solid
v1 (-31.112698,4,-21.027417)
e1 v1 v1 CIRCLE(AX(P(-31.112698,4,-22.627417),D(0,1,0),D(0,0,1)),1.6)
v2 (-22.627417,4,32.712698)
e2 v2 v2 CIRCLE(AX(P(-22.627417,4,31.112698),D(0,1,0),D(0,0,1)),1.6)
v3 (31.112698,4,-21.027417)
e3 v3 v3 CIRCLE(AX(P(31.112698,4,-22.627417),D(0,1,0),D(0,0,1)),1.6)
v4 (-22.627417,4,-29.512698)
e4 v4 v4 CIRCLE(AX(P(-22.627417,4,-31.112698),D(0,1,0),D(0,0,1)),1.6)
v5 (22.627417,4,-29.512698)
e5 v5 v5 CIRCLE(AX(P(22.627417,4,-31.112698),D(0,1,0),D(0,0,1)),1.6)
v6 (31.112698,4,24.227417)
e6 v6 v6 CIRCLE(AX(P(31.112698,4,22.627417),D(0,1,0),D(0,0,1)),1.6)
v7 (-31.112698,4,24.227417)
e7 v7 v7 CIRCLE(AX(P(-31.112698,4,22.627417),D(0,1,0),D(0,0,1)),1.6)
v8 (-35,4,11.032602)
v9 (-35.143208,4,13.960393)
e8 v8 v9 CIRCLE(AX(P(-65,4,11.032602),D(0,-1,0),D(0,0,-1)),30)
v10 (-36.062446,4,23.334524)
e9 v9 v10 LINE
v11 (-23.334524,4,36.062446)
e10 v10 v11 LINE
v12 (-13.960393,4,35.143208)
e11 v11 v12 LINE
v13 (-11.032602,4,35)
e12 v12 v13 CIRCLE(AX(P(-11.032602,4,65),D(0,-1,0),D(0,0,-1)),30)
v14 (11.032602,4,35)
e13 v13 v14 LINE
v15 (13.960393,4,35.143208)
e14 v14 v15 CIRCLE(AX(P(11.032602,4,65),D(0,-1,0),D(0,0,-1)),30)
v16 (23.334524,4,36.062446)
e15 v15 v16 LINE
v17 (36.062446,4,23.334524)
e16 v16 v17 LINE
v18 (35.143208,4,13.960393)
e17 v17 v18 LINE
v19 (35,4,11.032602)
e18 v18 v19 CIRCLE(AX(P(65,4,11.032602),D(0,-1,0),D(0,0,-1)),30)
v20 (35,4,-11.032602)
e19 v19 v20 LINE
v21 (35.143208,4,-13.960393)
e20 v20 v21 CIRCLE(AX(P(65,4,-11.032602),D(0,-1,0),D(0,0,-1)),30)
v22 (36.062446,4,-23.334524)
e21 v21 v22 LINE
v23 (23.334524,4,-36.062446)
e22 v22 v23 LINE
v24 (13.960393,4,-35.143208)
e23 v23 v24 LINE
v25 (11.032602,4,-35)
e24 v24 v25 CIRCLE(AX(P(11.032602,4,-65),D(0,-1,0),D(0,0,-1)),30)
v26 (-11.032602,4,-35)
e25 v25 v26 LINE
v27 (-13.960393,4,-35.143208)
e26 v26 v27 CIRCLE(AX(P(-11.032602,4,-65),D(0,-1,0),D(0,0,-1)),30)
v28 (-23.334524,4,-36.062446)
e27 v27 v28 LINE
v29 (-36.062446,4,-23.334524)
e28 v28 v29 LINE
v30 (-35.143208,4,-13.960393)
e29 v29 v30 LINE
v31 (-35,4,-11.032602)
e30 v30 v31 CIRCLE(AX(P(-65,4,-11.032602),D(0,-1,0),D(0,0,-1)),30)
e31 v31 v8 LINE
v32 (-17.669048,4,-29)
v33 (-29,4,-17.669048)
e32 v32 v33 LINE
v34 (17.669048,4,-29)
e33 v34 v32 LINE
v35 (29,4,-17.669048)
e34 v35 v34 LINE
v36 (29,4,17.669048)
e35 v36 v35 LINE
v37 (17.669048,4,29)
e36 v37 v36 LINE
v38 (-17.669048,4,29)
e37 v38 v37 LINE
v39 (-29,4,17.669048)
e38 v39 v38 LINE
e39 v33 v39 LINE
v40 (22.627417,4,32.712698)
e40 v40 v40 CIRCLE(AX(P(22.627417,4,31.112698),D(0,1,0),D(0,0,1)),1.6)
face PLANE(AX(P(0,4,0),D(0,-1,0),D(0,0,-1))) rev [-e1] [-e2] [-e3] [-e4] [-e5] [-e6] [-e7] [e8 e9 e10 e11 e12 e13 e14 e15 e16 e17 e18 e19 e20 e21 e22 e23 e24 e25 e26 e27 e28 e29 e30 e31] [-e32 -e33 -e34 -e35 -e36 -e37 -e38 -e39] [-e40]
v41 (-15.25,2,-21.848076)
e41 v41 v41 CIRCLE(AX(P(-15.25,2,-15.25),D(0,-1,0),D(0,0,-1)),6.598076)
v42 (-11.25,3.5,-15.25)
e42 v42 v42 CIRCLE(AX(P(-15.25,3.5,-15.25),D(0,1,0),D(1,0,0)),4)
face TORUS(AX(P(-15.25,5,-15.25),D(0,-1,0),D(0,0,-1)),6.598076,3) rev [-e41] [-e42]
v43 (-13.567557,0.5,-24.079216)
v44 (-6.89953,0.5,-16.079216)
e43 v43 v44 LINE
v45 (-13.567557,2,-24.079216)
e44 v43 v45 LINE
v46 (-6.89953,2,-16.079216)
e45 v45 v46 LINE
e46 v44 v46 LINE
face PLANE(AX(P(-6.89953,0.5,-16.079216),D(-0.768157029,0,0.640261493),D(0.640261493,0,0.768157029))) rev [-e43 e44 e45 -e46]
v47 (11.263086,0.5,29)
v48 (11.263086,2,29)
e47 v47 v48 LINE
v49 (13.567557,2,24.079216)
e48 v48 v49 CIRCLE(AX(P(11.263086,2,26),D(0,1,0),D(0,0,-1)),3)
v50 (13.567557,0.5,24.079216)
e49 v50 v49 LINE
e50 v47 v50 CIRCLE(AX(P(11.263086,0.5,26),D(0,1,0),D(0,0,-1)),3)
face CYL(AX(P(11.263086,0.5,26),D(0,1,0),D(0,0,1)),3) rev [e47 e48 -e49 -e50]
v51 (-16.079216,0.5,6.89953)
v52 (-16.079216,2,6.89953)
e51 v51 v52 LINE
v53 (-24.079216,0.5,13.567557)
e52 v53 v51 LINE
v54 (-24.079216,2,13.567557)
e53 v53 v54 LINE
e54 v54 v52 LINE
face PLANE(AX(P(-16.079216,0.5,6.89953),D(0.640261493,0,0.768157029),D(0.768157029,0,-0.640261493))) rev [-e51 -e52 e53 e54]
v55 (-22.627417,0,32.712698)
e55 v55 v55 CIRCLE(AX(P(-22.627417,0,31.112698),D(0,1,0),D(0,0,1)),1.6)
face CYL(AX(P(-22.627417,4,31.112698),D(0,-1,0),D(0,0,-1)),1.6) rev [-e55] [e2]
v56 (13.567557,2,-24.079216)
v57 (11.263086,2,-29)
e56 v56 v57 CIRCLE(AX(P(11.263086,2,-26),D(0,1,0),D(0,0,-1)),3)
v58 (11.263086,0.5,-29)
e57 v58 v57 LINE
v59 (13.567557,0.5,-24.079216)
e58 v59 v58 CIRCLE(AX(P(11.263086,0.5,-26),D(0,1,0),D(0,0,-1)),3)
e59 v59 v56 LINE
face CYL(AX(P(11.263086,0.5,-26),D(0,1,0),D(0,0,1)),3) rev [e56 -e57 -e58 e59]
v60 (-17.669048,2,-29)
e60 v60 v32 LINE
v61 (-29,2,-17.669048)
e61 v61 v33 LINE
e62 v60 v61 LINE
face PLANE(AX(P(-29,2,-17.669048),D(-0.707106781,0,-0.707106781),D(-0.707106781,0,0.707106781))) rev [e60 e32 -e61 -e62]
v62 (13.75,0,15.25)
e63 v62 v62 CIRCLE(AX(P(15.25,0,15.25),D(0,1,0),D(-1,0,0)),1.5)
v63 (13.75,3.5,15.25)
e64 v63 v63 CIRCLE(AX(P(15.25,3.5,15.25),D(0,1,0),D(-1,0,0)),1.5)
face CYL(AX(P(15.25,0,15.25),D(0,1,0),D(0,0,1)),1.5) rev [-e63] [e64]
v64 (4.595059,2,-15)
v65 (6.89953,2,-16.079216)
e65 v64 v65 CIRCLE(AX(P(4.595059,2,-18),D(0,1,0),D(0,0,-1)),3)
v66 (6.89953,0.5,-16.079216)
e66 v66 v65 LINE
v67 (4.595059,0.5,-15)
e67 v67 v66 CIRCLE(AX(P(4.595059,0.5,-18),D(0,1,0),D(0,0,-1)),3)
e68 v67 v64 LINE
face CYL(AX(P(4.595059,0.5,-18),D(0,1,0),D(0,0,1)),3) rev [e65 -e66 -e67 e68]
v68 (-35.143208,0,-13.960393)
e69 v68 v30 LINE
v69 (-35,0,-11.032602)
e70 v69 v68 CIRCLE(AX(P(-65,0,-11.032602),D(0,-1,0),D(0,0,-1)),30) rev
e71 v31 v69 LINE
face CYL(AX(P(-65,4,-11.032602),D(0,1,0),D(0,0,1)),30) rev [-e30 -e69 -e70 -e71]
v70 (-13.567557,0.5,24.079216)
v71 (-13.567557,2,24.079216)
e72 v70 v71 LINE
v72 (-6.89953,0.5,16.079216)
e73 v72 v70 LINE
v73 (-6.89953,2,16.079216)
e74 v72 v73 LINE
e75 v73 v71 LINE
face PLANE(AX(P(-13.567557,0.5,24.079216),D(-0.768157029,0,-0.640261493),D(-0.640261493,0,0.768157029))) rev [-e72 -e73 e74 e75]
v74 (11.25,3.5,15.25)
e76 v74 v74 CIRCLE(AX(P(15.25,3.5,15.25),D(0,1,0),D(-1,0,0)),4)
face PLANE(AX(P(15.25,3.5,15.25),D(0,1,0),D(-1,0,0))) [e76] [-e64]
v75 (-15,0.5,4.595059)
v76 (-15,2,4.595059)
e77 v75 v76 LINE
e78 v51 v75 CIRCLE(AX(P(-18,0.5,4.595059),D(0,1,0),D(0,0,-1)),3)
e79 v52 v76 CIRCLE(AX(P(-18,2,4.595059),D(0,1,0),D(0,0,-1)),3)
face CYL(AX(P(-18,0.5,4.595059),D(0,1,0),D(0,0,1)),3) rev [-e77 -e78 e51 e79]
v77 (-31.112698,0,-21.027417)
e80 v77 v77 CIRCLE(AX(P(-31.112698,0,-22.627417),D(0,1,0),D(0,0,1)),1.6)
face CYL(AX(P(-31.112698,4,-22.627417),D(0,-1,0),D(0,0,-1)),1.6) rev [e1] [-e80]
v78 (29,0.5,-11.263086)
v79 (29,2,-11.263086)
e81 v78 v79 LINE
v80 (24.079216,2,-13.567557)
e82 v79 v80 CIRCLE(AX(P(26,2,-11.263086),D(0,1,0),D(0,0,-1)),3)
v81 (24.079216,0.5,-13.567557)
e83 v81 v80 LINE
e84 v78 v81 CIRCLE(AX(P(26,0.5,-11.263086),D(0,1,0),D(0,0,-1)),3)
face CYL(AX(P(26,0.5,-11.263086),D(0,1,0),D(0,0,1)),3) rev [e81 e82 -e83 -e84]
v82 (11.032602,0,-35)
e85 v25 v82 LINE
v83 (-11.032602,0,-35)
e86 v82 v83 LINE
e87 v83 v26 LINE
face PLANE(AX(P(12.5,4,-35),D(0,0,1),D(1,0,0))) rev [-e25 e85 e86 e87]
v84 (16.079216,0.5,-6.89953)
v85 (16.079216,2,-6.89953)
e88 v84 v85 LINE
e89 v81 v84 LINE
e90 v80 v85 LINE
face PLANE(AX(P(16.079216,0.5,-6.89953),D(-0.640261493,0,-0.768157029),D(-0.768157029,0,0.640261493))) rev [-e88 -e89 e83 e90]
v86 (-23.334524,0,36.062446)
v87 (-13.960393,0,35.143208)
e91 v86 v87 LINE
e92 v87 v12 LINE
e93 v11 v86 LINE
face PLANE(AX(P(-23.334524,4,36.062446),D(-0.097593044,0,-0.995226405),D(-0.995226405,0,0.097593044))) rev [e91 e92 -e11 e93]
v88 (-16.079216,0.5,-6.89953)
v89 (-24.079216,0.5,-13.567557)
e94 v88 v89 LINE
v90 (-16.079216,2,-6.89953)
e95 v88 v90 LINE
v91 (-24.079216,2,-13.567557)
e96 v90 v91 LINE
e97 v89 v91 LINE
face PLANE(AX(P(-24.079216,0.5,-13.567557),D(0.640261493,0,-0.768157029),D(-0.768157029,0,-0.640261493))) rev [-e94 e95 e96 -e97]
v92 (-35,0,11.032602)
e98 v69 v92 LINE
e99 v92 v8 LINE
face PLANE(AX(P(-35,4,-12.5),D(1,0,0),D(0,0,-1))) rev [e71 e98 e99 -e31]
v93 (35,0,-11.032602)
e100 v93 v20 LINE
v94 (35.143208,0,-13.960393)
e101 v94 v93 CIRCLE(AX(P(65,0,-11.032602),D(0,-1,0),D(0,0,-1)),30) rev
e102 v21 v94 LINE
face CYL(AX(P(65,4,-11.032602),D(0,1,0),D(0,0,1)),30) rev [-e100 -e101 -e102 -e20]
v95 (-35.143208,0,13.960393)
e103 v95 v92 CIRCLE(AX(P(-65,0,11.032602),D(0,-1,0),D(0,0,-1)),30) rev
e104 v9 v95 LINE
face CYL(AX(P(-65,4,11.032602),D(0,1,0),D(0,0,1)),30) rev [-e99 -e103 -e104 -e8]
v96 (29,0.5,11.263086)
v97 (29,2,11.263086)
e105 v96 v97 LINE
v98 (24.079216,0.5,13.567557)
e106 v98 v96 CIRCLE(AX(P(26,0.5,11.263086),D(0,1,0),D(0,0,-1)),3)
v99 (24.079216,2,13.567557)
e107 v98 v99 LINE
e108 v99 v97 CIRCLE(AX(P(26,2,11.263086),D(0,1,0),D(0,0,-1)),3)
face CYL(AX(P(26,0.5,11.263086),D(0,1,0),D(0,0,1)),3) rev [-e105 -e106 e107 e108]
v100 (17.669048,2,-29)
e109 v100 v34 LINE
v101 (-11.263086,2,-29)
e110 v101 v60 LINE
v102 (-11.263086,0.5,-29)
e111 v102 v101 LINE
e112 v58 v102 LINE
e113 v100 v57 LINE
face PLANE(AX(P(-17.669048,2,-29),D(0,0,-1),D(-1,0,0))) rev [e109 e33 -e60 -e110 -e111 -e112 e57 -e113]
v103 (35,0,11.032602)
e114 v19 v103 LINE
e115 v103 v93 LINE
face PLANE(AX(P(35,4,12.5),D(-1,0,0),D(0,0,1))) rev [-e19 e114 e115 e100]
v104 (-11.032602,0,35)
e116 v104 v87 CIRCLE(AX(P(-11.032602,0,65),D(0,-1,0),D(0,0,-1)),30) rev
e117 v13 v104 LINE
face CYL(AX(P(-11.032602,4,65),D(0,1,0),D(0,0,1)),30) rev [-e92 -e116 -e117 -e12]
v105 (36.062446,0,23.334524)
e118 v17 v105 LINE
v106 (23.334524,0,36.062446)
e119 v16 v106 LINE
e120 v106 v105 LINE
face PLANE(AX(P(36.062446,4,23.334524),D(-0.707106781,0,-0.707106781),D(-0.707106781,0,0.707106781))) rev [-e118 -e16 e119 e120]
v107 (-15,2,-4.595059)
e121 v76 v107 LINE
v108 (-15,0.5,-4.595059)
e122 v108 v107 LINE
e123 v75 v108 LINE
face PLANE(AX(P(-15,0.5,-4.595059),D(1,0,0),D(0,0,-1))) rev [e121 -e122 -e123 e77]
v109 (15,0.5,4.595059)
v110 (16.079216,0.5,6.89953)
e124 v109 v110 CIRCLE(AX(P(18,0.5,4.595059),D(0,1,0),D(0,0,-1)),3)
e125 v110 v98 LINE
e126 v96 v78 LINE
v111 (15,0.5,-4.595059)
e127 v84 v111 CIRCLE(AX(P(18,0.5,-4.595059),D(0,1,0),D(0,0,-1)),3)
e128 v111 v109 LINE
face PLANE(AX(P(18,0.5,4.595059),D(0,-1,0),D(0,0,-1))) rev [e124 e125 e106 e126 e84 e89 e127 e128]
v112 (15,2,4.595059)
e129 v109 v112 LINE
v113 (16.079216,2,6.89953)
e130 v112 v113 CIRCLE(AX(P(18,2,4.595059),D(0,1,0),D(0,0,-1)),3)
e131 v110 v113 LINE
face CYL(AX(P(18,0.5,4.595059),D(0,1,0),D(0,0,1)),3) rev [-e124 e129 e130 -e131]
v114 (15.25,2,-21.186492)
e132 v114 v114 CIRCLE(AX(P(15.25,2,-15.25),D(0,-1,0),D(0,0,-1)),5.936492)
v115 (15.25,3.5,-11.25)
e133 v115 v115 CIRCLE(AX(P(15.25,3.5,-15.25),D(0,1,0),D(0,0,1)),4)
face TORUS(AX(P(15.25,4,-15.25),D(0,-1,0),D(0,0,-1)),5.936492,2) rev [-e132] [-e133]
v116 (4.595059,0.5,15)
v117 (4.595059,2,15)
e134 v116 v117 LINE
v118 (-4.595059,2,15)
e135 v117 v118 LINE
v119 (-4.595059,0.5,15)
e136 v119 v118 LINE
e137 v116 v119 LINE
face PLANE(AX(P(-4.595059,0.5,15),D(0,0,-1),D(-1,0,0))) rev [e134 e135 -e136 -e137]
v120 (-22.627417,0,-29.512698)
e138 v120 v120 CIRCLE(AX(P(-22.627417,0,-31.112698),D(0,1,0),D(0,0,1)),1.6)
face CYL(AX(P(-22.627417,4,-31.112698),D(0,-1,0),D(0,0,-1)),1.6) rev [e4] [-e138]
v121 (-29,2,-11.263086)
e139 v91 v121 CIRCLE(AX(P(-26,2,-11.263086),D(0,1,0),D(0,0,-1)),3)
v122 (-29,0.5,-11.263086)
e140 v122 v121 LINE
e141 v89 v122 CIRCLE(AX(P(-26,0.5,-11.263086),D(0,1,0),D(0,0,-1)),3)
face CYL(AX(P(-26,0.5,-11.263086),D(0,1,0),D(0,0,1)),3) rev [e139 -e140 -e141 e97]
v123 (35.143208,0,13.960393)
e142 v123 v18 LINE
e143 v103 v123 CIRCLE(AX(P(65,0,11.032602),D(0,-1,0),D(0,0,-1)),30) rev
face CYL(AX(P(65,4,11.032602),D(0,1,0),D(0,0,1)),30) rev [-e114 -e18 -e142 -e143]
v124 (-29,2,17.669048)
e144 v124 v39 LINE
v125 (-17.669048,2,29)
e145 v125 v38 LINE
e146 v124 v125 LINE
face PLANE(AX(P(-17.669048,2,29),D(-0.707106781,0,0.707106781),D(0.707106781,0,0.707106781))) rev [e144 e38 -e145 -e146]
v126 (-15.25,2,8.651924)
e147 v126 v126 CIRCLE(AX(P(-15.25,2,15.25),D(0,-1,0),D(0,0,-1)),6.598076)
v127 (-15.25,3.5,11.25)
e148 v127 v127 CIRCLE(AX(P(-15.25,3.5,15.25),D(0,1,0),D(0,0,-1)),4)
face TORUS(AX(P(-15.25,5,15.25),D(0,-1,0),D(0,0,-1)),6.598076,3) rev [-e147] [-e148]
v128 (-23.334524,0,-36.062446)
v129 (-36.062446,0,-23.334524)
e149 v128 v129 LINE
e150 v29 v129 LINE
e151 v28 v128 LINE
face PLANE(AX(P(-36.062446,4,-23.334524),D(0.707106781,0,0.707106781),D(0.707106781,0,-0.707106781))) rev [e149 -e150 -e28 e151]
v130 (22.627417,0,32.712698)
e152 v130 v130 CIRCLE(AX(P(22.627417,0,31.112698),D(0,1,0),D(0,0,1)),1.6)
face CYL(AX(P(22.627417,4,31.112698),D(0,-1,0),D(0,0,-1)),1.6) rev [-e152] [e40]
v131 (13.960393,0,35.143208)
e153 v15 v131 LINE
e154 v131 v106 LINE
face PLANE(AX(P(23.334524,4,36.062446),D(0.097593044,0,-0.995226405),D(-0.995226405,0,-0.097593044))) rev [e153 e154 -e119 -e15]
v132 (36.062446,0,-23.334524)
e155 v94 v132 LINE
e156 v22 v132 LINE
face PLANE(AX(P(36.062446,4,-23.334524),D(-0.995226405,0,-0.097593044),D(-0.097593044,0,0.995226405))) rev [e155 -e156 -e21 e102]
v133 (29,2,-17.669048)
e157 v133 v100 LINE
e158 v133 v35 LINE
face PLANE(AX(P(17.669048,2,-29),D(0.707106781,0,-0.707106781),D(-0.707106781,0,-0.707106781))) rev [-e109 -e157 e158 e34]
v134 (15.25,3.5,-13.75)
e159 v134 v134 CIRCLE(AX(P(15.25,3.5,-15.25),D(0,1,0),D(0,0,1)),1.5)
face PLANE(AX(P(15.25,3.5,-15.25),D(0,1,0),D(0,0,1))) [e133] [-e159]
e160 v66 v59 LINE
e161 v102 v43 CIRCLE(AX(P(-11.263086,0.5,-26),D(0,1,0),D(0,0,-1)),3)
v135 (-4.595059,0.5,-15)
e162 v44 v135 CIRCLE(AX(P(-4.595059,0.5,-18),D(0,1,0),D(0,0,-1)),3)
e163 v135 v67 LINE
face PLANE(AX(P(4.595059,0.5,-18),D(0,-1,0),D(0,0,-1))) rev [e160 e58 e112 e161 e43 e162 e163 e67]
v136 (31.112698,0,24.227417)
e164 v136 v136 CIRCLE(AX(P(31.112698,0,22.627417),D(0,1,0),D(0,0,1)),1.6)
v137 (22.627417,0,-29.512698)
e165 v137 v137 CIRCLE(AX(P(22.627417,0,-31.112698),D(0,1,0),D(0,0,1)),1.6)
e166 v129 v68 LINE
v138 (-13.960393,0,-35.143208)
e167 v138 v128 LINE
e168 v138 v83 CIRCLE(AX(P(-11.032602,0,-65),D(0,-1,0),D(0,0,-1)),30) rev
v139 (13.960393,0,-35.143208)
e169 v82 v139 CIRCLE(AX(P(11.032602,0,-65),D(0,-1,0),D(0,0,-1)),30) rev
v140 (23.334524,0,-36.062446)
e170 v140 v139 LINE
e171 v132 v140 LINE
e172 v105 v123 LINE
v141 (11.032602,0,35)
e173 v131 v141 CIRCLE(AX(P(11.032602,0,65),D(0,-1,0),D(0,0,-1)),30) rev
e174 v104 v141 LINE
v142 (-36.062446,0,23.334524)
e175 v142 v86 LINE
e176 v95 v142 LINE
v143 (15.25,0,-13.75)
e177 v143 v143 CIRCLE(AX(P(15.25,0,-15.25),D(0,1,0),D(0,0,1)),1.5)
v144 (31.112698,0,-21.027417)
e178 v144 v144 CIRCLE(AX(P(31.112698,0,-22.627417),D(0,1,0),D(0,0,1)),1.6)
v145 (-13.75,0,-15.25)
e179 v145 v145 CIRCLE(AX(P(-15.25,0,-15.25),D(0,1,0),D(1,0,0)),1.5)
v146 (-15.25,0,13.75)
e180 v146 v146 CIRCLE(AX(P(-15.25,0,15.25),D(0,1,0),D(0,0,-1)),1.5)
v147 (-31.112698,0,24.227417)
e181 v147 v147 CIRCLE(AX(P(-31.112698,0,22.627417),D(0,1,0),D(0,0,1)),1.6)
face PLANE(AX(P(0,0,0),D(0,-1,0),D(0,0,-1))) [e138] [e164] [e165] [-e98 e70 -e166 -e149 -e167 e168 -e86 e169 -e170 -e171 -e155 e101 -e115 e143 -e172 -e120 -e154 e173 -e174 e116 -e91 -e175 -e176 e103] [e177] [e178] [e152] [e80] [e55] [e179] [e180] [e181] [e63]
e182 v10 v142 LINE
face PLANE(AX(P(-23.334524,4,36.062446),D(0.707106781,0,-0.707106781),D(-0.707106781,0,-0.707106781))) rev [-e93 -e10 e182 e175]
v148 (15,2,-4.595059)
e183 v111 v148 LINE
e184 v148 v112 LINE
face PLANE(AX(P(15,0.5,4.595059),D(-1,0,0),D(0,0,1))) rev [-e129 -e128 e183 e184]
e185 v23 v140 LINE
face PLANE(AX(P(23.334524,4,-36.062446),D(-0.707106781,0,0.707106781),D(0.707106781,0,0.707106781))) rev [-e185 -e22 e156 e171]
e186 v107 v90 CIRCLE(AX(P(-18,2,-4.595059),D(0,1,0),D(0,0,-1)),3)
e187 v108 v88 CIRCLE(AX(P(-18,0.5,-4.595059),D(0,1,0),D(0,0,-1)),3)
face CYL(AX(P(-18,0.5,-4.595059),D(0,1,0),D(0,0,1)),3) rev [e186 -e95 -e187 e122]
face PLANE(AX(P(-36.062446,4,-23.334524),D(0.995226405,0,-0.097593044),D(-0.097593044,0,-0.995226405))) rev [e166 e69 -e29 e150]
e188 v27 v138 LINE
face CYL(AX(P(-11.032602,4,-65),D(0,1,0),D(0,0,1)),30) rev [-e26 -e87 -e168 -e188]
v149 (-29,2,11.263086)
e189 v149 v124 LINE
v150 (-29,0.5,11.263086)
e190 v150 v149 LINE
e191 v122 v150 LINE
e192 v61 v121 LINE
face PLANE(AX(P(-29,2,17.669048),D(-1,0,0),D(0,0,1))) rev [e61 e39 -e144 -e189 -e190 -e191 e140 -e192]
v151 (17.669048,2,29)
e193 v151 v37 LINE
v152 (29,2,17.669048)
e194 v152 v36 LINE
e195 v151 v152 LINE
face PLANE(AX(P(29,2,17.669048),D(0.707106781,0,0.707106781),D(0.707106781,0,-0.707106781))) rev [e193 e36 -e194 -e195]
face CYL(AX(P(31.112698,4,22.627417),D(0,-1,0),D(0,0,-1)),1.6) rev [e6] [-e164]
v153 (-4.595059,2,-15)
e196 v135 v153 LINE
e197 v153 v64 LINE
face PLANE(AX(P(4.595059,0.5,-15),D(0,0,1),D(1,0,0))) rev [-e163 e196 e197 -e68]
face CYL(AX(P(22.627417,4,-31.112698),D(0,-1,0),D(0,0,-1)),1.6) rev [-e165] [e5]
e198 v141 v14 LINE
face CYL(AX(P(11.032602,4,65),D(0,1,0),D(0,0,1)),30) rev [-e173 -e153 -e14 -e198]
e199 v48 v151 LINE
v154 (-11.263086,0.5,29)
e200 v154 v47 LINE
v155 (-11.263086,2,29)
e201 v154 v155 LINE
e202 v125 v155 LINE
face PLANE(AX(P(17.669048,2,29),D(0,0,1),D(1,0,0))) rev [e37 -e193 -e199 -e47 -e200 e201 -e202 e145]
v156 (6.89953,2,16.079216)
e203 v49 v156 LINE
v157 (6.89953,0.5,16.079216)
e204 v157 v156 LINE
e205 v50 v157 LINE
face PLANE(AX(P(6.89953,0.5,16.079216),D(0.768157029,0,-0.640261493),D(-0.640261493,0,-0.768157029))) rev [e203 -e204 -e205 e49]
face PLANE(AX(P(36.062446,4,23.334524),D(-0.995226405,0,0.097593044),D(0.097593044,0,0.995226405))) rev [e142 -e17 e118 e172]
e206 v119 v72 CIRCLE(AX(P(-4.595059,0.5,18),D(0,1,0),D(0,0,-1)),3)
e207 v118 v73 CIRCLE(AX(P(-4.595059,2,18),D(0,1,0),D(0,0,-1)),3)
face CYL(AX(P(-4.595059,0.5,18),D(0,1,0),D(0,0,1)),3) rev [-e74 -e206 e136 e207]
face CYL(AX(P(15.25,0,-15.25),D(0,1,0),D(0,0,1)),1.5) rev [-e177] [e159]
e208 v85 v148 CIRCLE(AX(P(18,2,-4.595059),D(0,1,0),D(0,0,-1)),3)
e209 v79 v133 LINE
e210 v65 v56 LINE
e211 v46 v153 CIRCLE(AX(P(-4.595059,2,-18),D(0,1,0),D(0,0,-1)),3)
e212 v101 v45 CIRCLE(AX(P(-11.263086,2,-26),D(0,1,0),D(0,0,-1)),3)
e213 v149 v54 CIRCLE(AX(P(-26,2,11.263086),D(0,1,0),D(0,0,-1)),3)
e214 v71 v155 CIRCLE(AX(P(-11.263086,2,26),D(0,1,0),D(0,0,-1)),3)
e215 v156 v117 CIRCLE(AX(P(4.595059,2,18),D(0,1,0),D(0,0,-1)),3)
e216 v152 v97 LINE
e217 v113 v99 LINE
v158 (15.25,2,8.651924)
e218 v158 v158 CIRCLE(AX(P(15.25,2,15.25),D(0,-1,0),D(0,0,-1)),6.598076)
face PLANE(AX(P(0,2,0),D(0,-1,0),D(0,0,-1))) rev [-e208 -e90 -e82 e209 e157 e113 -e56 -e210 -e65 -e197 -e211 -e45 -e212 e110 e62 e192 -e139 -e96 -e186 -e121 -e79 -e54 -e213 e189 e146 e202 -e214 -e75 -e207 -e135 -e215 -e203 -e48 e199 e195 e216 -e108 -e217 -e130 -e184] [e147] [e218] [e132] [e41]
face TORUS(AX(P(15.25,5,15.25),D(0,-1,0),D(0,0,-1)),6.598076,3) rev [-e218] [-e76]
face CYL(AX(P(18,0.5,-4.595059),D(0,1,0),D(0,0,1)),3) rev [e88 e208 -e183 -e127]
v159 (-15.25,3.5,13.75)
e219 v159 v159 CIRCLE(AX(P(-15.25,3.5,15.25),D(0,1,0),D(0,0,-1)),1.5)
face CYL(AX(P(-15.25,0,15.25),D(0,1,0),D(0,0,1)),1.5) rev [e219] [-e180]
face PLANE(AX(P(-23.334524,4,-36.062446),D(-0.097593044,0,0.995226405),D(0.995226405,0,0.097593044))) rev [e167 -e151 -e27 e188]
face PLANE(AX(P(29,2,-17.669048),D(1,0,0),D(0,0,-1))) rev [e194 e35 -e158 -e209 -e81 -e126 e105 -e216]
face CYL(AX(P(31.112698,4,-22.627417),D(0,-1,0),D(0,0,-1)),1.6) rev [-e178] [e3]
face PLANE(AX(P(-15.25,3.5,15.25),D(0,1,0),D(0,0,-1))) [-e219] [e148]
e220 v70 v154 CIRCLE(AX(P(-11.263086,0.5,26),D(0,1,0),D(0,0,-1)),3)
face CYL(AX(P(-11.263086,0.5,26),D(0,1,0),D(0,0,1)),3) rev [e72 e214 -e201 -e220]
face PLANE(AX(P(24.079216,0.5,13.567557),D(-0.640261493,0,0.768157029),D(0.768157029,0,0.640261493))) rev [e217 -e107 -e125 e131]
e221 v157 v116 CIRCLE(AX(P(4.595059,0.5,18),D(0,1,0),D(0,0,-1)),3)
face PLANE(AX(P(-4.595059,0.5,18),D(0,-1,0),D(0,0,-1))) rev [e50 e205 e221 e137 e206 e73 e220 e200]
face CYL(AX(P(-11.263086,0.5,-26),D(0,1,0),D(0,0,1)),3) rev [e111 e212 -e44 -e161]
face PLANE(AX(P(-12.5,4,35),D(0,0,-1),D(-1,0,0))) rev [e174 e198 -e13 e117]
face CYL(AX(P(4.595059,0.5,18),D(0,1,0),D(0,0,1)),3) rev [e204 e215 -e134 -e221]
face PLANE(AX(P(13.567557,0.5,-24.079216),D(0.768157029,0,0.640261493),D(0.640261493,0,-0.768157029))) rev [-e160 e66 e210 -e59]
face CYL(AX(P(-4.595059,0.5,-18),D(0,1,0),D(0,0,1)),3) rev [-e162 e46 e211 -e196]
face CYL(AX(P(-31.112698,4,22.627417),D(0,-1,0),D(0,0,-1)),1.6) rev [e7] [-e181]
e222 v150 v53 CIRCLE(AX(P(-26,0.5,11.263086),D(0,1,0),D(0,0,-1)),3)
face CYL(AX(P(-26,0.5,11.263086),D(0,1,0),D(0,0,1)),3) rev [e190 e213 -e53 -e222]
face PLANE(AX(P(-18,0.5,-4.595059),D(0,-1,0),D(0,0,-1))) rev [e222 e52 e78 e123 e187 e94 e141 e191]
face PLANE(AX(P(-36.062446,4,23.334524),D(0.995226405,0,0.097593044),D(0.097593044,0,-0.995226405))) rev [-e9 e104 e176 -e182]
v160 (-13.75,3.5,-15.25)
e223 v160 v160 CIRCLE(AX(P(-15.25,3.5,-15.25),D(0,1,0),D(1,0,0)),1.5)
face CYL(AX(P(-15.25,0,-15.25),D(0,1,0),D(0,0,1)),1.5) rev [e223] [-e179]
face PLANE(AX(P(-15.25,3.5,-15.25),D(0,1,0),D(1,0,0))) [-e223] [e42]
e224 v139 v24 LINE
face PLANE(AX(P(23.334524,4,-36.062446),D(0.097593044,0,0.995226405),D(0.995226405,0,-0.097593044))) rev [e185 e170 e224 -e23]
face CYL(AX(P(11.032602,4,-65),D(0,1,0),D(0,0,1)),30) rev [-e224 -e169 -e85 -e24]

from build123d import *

# Parameters (mm, degrees)
SKETCH1_R           = 1.6
BOSS_EXTRUDE1_DEPTH = 4
CUT_EXTRUDE1_DEPTH  = 2
CUT_EXTRUDE2_DEPTH  = 1.5
SKETCH5_R           = 4
BOSS_EXTRUDE2_DEPTH = 1.5
SKETCH8_R           = 1.5
CUT_EXTRUDE3_DEPTH  = 52.119956964
CIRPATTERN1_COUNT   = 4
FILLET1_R           = 3
FILLET1_R_2         = 2
FILLET2_R           = 30


with BuildPart() as part:
    # Sketch1 → Boss-Extrude1 (new body)
    with BuildSketch(Plane(origin=(0, 0, 0), x_dir=(1, 0, 0), z_dir=(0, 1, 0))):
        Polygon((12.5, 35), (-12.5, 35), (-23.334523779, 36.062445841), (-36.062445841, 23.334523779), (-35, 12.5), (-35, -12.5), (-36.062445841, -23.334523779), (-23.334523779, -36.062445841), (-12.5, -35), (12.5, -35), (23.334523779, -36.062445841), (36.062445841, -23.334523779), (35, -12.5), (35, 12.5), (36.062445841, 23.334523779), (23.334523779, 36.062445841), align=None)
        with Locations(Location((22.627416998, 31.112698372, 0), (0, 0, 270))):
            Circle(SKETCH1_R, mode=Mode.SUBTRACT)
        with Locations(Location((31.112698372, 22.627416998, 0), (0, 0, 270))):
            Circle(SKETCH1_R, mode=Mode.SUBTRACT)
        with Locations(Location((22.627416998, -31.112698372, 0), (0, 0, 270))):
            Circle(SKETCH1_R, mode=Mode.SUBTRACT)
        with Locations(Location((31.112698372, -22.627416998, 0), (0, 0, 270))):
            Circle(SKETCH1_R, mode=Mode.SUBTRACT)
        with Locations(Location((-31.112698372, -22.627416998, 0), (0, 0, 270))):
            Circle(SKETCH1_R, mode=Mode.SUBTRACT)
        with Locations(Location((-22.627416998, -31.112698372, 0), (0, 0, 270))):
            Circle(SKETCH1_R, mode=Mode.SUBTRACT)
        with Locations(Location((-22.627416998, 31.112698372, 0), (0, 0, 270))):
            Circle(SKETCH1_R, mode=Mode.SUBTRACT)
        with Locations(Location((-31.112698372, 22.627416998, 0), (0, 0, 270))):
            Circle(SKETCH1_R, mode=Mode.SUBTRACT)
    extrude(amount=BOSS_EXTRUDE1_DEPTH)

    # Sketch2 → Cut-Extrude1 (cut)
    with BuildSketch(Plane(origin=(0, 4, 0), x_dir=(1, 0, 0), z_dir=(0, 1, 0))):
        Polygon((-17.669047558, 29), (17.669047558, 29), (29, 17.669047558), (29, -17.669047558), (17.669047558, -29), (-17.669047558, -29), (-29, -17.669047558), (-29, 17.669047558), align=None)
    extrude(amount=-CUT_EXTRUDE1_DEPTH, mode=Mode.SUBTRACT)

    # Sketch4 → Cut-Extrude2 (cut)
    with BuildSketch(Plane(origin=(0, 2, 0), x_dir=(1, 0, 0), z_dir=(0, 1, 0))):
        with BuildLine():
            Line((-24.079215521, 13.567556979), (-16.079215521, 6.899529803))
            ThreePointArc((-16.079215521, 6.899529803), (-15.283167889, 5.867388581), (-15, 4.595058717))
            Line((-15, 4.595058717), (-15, -4.595058717))
            ThreePointArc((-15, -4.595058717), (-15.283167889, -5.867388581), (-16.079215521, -6.899529803))
            Line((-16.079215521, -6.899529803), (-24.079215521, -13.567556979))
            ThreePointArc((-24.079215521, -13.567556979), (-27.272329864, -13.979918004), (-29, -11.263085893))
            Line((-29, -11.263085893), (-29, 11.263085893))
            ThreePointArc((-29, 11.263085893), (-27.272329864, 13.979918004), (-24.079215521, 13.567556979))
        make_face()
        with BuildLine():
            Line((-11.263085893, 29), (11.263085893, 29))
            ThreePointArc((11.263085893, 29), (13.979918004, 27.272329864), (13.567556979, 24.079215521))
            Line((13.567556979, 24.079215521), (6.899529803, 16.079215521))
            ThreePointArc((6.899529803, 16.079215521), (5.867388581, 15.283167889), (4.595058717, 15))
            Line((4.595058717, 15), (-4.595058717, 15))
            ThreePointArc((-4.595058717, 15), (-5.867388581, 15.283167889), (-6.899529803, 16.079215521))
            Line((-6.899529803, 16.079215521), (-13.567556979, 24.079215521))
            ThreePointArc((-13.567556979, 24.079215521), (-13.979918004, 27.272329864), (-11.263085893, 29))
        make_face()
        with BuildLine():
            Line((29, 11.263085893), (29, -11.263085893))
            ThreePointArc((29, -11.263085893), (27.272329864, -13.979918004), (24.079215521, -13.567556979))
            Line((24.079215521, -13.567556979), (16.079215521, -6.899529803))
            ThreePointArc((16.079215521, -6.899529803), (15.283167889, -5.867388581), (15, -4.595058717))
            Line((15, -4.595058717), (15, 4.595058717))
            ThreePointArc((15, 4.595058717), (15.283167889, 5.867388581), (16.079215521, 6.899529803))
            Line((16.079215521, 6.899529803), (24.079215521, 13.567556979))
            ThreePointArc((24.079215521, 13.567556979), (27.272329864, 13.979918004), (29, 11.263085893))
        make_face()
        with BuildLine():
            Line((11.263085893, -29), (-11.263085893, -29))
            ThreePointArc((-11.263085893, -29), (-13.979918004, -27.272329864), (-13.567556979, -24.079215521))
            Line((-13.567556979, -24.079215521), (-6.899529803, -16.079215521))
            ThreePointArc((-6.899529803, -16.079215521), (-5.867388581, -15.283167889), (-4.595058717, -15))
            Line((-4.595058717, -15), (4.595058717, -15))
            ThreePointArc((4.595058717, -15), (5.867388581, -15.283167889), (6.899529803, -16.079215521))
            Line((6.899529803, -16.079215521), (13.567556979, -24.079215521))
            ThreePointArc((13.567556979, -24.079215521), (13.979918004, -27.272329864), (11.263085893, -29))
        make_face()
    extrude(amount=-CUT_EXTRUDE2_DEPTH, mode=Mode.SUBTRACT)

    # Sketch5 → Boss-Extrude2 (add)
    with BuildSketch(Plane(origin=(0, 2, 0), x_dir=(1, 0, 0), z_dir=(0, 1, 0))):
        with Locations(Location((15.25, 15.25, 0), (0, 0, 90))):
            Circle(SKETCH5_R)
    boss_extrude2 = extrude(amount=BOSS_EXTRUDE2_DEPTH)

    # Sketch8 → Cut-Extrude3 (cut, through all)
    with BuildSketch(Plane(origin=(0, 3.5, 0), x_dir=(1, 0, 0), z_dir=(0, 1, 0))):
        with Locations(Location((15.25, 15.25, 0), (0, 0, 270))):
            Circle(SKETCH8_R)
    cut_extrude3 = extrude(amount=-CUT_EXTRUDE3_DEPTH, mode=Mode.SUBTRACT)

    # CirPattern1: Boss-Extrude2, Cut-Extrude3 ×4 about axis
    cirpattern1_axis = Axis((0, 0, 0), (0, 1, 0))
    add([boss_extrude2.rotate(cirpattern1_axis, i * 360 / CIRPATTERN1_COUNT) for i in range(1, CIRPATTERN1_COUNT)])
    add([cut_extrude3.rotate(cirpattern1_axis, i * 360 / CIRPATTERN1_COUNT) for i in range(1, CIRPATTERN1_COUNT)], mode=Mode.SUBTRACT)

    # Fillet1
    # the kernel refuses this fillet: 3, 2 mm, written as the material it adds along each edge
    with BuildSketch(Plane(origin=(-15.25, 2, -15.25), x_dir=(-1, 0, 0), z_dir=(0, 0, -1))) as fillet1_piece_1:
        with BuildLine():
            CenterArc((6.598076211, 3), FILLET1_R, 210, 60)
            Line((4, 1.5), (3.948038476, 1.47))
            ThreePointArc((3.948038476, 1.47), (3.94, 0.75), (3.94, 0))
            Line((3.94, 0), (4, -0.06))
            Line((4, -0.06), (6.598076211, -0.06))
            Line((6.598076211, -0.06), (6.598076211, 0))
        make_face()
    revolve(axis=Axis((-15.25, 2, -15.25), (0, 1, 0)))
    with BuildSketch(Plane(origin=(-15.25, 2, 15.25), x_dir=(0, 0, 1), z_dir=(-1, 0, 0))) as fillet1_piece_2:
        with BuildLine():
            CenterArc((6.598076211, 3), FILLET1_R, 210, 60)
            Line((4, 1.5), (3.948038476, 1.47))
            ThreePointArc((3.948038476, 1.47), (3.94, 0.75), (3.94, 0))
            Line((3.94, 0), (4, -0.06))
            Line((4, -0.06), (6.598076211, -0.06))
            Line((6.598076211, -0.06), (6.598076211, 0))
        make_face()
    revolve(axis=Axis((-15.25, 2, 15.25), (0, 1, 0)))
    with BuildSketch(Plane(origin=(15.25, 2, 15.25), x_dir=(1, 0, 0), z_dir=(0, 0, 1))) as fillet1_piece_3:
        with BuildLine():
            CenterArc((6.598076211, 3), FILLET1_R, 210, 60)
            Line((4, 1.5), (3.948038476, 1.47))
            ThreePointArc((3.948038476, 1.47), (3.94, 0.75), (3.94, 0))
            Line((3.94, 0), (4, -0.06))
            Line((4, -0.06), (6.598076211, -0.06))
            Line((6.598076211, -0.06), (6.598076211, 0))
        make_face()
    revolve(axis=Axis((15.25, 2, 15.25), (0, 1, 0)))
    with BuildSketch(Plane(origin=(15.25, 2, -15.25), x_dir=(0, 0, -1), z_dir=(1, 0, 0))) as fillet1_piece_4:
        with BuildLine():
            CenterArc((5.936491673, 2), FILLET1_R_2, 194.477512186, 75.522487814)
            Line((4, 1.5), (3.961270167, 1.49))
            ThreePointArc((3.961270167, 1.49), (3.96, 0.75), (3.96, 0))
            Line((3.96, 0), (4, -0.04))
            Line((4, -0.04), (5.936491673, -0.04))
            Line((5.936491673, -0.04), (5.936491673, 0))
        make_face()
    revolve(axis=Axis((15.25, 2, -15.25), (0, 1, 0)))

    # Fillet2
    # the kernel refuses this fillet: 30 mm, written as the material it adds along each edge
    with BuildSketch(Plane(origin=(-12.5, 0, -35), x_dir=(1, 0, 0), z_dir=(0, 1, 0)), Plane(origin=(-12.5, 0, 35), x_dir=(-0.9952264052892464, 0, 0.09759304388656438), z_dir=(0, 1, 0)), Plane(origin=(-35, 0, 12.5), x_dir=(0, 0, -1), z_dir=(0, 1, 0)), Plane(origin=(-35, 0, -12.5), x_dir=(-0.09759304388656037, 0, -0.9952264052892466), z_dir=(0, 1, 0))) as fillet2_piece_1:
        with BuildLine():
            CenterArc((FILLET2_R * 0.0489132680017, FILLET2_R), FILLET2_R, 264.399415997, 5.600584003)
            Line((-FILLET2_R * 0.0486797758843, FILLET2_R * 0.0047735947107), (0, 0))
            Line((0, 0), (FILLET2_R * 0.0489132680017, 0))
        make_face()
    extrude(amount=4)
    with BuildSketch(Plane(origin=(12.5, 0, -35), x_dir=(-1, 0, 0), z_dir=(0, 1, 0)), Plane(origin=(35, 0, -12.5), x_dir=(0.09759304388597856, 0, -0.9952264052893037), z_dir=(0, 1, 0)), Plane(origin=(35, 0, 12.5), x_dir=(0, 0, -1), z_dir=(0, 1, 0)), Plane(origin=(12.5, 0, 35), x_dir=(0.9952264052893038, 0, 0.09759304388597881), z_dir=(0, 1, 0))) as fillet2_piece_2:
        with BuildLine():
            CenterArc((FILLET2_R * 0.048913268002, -FILLET2_R), FILLET2_R, 90, 5.600584003)
            Line((-FILLET2_R * 0.0486797758846, -FILLET2_R * 0.00477359471075), (0, 0))
            Line((0, 0), (FILLET2_R * 0.048913268002, 0))
        make_face()
    extrude(amount=4)


solid = part.part
